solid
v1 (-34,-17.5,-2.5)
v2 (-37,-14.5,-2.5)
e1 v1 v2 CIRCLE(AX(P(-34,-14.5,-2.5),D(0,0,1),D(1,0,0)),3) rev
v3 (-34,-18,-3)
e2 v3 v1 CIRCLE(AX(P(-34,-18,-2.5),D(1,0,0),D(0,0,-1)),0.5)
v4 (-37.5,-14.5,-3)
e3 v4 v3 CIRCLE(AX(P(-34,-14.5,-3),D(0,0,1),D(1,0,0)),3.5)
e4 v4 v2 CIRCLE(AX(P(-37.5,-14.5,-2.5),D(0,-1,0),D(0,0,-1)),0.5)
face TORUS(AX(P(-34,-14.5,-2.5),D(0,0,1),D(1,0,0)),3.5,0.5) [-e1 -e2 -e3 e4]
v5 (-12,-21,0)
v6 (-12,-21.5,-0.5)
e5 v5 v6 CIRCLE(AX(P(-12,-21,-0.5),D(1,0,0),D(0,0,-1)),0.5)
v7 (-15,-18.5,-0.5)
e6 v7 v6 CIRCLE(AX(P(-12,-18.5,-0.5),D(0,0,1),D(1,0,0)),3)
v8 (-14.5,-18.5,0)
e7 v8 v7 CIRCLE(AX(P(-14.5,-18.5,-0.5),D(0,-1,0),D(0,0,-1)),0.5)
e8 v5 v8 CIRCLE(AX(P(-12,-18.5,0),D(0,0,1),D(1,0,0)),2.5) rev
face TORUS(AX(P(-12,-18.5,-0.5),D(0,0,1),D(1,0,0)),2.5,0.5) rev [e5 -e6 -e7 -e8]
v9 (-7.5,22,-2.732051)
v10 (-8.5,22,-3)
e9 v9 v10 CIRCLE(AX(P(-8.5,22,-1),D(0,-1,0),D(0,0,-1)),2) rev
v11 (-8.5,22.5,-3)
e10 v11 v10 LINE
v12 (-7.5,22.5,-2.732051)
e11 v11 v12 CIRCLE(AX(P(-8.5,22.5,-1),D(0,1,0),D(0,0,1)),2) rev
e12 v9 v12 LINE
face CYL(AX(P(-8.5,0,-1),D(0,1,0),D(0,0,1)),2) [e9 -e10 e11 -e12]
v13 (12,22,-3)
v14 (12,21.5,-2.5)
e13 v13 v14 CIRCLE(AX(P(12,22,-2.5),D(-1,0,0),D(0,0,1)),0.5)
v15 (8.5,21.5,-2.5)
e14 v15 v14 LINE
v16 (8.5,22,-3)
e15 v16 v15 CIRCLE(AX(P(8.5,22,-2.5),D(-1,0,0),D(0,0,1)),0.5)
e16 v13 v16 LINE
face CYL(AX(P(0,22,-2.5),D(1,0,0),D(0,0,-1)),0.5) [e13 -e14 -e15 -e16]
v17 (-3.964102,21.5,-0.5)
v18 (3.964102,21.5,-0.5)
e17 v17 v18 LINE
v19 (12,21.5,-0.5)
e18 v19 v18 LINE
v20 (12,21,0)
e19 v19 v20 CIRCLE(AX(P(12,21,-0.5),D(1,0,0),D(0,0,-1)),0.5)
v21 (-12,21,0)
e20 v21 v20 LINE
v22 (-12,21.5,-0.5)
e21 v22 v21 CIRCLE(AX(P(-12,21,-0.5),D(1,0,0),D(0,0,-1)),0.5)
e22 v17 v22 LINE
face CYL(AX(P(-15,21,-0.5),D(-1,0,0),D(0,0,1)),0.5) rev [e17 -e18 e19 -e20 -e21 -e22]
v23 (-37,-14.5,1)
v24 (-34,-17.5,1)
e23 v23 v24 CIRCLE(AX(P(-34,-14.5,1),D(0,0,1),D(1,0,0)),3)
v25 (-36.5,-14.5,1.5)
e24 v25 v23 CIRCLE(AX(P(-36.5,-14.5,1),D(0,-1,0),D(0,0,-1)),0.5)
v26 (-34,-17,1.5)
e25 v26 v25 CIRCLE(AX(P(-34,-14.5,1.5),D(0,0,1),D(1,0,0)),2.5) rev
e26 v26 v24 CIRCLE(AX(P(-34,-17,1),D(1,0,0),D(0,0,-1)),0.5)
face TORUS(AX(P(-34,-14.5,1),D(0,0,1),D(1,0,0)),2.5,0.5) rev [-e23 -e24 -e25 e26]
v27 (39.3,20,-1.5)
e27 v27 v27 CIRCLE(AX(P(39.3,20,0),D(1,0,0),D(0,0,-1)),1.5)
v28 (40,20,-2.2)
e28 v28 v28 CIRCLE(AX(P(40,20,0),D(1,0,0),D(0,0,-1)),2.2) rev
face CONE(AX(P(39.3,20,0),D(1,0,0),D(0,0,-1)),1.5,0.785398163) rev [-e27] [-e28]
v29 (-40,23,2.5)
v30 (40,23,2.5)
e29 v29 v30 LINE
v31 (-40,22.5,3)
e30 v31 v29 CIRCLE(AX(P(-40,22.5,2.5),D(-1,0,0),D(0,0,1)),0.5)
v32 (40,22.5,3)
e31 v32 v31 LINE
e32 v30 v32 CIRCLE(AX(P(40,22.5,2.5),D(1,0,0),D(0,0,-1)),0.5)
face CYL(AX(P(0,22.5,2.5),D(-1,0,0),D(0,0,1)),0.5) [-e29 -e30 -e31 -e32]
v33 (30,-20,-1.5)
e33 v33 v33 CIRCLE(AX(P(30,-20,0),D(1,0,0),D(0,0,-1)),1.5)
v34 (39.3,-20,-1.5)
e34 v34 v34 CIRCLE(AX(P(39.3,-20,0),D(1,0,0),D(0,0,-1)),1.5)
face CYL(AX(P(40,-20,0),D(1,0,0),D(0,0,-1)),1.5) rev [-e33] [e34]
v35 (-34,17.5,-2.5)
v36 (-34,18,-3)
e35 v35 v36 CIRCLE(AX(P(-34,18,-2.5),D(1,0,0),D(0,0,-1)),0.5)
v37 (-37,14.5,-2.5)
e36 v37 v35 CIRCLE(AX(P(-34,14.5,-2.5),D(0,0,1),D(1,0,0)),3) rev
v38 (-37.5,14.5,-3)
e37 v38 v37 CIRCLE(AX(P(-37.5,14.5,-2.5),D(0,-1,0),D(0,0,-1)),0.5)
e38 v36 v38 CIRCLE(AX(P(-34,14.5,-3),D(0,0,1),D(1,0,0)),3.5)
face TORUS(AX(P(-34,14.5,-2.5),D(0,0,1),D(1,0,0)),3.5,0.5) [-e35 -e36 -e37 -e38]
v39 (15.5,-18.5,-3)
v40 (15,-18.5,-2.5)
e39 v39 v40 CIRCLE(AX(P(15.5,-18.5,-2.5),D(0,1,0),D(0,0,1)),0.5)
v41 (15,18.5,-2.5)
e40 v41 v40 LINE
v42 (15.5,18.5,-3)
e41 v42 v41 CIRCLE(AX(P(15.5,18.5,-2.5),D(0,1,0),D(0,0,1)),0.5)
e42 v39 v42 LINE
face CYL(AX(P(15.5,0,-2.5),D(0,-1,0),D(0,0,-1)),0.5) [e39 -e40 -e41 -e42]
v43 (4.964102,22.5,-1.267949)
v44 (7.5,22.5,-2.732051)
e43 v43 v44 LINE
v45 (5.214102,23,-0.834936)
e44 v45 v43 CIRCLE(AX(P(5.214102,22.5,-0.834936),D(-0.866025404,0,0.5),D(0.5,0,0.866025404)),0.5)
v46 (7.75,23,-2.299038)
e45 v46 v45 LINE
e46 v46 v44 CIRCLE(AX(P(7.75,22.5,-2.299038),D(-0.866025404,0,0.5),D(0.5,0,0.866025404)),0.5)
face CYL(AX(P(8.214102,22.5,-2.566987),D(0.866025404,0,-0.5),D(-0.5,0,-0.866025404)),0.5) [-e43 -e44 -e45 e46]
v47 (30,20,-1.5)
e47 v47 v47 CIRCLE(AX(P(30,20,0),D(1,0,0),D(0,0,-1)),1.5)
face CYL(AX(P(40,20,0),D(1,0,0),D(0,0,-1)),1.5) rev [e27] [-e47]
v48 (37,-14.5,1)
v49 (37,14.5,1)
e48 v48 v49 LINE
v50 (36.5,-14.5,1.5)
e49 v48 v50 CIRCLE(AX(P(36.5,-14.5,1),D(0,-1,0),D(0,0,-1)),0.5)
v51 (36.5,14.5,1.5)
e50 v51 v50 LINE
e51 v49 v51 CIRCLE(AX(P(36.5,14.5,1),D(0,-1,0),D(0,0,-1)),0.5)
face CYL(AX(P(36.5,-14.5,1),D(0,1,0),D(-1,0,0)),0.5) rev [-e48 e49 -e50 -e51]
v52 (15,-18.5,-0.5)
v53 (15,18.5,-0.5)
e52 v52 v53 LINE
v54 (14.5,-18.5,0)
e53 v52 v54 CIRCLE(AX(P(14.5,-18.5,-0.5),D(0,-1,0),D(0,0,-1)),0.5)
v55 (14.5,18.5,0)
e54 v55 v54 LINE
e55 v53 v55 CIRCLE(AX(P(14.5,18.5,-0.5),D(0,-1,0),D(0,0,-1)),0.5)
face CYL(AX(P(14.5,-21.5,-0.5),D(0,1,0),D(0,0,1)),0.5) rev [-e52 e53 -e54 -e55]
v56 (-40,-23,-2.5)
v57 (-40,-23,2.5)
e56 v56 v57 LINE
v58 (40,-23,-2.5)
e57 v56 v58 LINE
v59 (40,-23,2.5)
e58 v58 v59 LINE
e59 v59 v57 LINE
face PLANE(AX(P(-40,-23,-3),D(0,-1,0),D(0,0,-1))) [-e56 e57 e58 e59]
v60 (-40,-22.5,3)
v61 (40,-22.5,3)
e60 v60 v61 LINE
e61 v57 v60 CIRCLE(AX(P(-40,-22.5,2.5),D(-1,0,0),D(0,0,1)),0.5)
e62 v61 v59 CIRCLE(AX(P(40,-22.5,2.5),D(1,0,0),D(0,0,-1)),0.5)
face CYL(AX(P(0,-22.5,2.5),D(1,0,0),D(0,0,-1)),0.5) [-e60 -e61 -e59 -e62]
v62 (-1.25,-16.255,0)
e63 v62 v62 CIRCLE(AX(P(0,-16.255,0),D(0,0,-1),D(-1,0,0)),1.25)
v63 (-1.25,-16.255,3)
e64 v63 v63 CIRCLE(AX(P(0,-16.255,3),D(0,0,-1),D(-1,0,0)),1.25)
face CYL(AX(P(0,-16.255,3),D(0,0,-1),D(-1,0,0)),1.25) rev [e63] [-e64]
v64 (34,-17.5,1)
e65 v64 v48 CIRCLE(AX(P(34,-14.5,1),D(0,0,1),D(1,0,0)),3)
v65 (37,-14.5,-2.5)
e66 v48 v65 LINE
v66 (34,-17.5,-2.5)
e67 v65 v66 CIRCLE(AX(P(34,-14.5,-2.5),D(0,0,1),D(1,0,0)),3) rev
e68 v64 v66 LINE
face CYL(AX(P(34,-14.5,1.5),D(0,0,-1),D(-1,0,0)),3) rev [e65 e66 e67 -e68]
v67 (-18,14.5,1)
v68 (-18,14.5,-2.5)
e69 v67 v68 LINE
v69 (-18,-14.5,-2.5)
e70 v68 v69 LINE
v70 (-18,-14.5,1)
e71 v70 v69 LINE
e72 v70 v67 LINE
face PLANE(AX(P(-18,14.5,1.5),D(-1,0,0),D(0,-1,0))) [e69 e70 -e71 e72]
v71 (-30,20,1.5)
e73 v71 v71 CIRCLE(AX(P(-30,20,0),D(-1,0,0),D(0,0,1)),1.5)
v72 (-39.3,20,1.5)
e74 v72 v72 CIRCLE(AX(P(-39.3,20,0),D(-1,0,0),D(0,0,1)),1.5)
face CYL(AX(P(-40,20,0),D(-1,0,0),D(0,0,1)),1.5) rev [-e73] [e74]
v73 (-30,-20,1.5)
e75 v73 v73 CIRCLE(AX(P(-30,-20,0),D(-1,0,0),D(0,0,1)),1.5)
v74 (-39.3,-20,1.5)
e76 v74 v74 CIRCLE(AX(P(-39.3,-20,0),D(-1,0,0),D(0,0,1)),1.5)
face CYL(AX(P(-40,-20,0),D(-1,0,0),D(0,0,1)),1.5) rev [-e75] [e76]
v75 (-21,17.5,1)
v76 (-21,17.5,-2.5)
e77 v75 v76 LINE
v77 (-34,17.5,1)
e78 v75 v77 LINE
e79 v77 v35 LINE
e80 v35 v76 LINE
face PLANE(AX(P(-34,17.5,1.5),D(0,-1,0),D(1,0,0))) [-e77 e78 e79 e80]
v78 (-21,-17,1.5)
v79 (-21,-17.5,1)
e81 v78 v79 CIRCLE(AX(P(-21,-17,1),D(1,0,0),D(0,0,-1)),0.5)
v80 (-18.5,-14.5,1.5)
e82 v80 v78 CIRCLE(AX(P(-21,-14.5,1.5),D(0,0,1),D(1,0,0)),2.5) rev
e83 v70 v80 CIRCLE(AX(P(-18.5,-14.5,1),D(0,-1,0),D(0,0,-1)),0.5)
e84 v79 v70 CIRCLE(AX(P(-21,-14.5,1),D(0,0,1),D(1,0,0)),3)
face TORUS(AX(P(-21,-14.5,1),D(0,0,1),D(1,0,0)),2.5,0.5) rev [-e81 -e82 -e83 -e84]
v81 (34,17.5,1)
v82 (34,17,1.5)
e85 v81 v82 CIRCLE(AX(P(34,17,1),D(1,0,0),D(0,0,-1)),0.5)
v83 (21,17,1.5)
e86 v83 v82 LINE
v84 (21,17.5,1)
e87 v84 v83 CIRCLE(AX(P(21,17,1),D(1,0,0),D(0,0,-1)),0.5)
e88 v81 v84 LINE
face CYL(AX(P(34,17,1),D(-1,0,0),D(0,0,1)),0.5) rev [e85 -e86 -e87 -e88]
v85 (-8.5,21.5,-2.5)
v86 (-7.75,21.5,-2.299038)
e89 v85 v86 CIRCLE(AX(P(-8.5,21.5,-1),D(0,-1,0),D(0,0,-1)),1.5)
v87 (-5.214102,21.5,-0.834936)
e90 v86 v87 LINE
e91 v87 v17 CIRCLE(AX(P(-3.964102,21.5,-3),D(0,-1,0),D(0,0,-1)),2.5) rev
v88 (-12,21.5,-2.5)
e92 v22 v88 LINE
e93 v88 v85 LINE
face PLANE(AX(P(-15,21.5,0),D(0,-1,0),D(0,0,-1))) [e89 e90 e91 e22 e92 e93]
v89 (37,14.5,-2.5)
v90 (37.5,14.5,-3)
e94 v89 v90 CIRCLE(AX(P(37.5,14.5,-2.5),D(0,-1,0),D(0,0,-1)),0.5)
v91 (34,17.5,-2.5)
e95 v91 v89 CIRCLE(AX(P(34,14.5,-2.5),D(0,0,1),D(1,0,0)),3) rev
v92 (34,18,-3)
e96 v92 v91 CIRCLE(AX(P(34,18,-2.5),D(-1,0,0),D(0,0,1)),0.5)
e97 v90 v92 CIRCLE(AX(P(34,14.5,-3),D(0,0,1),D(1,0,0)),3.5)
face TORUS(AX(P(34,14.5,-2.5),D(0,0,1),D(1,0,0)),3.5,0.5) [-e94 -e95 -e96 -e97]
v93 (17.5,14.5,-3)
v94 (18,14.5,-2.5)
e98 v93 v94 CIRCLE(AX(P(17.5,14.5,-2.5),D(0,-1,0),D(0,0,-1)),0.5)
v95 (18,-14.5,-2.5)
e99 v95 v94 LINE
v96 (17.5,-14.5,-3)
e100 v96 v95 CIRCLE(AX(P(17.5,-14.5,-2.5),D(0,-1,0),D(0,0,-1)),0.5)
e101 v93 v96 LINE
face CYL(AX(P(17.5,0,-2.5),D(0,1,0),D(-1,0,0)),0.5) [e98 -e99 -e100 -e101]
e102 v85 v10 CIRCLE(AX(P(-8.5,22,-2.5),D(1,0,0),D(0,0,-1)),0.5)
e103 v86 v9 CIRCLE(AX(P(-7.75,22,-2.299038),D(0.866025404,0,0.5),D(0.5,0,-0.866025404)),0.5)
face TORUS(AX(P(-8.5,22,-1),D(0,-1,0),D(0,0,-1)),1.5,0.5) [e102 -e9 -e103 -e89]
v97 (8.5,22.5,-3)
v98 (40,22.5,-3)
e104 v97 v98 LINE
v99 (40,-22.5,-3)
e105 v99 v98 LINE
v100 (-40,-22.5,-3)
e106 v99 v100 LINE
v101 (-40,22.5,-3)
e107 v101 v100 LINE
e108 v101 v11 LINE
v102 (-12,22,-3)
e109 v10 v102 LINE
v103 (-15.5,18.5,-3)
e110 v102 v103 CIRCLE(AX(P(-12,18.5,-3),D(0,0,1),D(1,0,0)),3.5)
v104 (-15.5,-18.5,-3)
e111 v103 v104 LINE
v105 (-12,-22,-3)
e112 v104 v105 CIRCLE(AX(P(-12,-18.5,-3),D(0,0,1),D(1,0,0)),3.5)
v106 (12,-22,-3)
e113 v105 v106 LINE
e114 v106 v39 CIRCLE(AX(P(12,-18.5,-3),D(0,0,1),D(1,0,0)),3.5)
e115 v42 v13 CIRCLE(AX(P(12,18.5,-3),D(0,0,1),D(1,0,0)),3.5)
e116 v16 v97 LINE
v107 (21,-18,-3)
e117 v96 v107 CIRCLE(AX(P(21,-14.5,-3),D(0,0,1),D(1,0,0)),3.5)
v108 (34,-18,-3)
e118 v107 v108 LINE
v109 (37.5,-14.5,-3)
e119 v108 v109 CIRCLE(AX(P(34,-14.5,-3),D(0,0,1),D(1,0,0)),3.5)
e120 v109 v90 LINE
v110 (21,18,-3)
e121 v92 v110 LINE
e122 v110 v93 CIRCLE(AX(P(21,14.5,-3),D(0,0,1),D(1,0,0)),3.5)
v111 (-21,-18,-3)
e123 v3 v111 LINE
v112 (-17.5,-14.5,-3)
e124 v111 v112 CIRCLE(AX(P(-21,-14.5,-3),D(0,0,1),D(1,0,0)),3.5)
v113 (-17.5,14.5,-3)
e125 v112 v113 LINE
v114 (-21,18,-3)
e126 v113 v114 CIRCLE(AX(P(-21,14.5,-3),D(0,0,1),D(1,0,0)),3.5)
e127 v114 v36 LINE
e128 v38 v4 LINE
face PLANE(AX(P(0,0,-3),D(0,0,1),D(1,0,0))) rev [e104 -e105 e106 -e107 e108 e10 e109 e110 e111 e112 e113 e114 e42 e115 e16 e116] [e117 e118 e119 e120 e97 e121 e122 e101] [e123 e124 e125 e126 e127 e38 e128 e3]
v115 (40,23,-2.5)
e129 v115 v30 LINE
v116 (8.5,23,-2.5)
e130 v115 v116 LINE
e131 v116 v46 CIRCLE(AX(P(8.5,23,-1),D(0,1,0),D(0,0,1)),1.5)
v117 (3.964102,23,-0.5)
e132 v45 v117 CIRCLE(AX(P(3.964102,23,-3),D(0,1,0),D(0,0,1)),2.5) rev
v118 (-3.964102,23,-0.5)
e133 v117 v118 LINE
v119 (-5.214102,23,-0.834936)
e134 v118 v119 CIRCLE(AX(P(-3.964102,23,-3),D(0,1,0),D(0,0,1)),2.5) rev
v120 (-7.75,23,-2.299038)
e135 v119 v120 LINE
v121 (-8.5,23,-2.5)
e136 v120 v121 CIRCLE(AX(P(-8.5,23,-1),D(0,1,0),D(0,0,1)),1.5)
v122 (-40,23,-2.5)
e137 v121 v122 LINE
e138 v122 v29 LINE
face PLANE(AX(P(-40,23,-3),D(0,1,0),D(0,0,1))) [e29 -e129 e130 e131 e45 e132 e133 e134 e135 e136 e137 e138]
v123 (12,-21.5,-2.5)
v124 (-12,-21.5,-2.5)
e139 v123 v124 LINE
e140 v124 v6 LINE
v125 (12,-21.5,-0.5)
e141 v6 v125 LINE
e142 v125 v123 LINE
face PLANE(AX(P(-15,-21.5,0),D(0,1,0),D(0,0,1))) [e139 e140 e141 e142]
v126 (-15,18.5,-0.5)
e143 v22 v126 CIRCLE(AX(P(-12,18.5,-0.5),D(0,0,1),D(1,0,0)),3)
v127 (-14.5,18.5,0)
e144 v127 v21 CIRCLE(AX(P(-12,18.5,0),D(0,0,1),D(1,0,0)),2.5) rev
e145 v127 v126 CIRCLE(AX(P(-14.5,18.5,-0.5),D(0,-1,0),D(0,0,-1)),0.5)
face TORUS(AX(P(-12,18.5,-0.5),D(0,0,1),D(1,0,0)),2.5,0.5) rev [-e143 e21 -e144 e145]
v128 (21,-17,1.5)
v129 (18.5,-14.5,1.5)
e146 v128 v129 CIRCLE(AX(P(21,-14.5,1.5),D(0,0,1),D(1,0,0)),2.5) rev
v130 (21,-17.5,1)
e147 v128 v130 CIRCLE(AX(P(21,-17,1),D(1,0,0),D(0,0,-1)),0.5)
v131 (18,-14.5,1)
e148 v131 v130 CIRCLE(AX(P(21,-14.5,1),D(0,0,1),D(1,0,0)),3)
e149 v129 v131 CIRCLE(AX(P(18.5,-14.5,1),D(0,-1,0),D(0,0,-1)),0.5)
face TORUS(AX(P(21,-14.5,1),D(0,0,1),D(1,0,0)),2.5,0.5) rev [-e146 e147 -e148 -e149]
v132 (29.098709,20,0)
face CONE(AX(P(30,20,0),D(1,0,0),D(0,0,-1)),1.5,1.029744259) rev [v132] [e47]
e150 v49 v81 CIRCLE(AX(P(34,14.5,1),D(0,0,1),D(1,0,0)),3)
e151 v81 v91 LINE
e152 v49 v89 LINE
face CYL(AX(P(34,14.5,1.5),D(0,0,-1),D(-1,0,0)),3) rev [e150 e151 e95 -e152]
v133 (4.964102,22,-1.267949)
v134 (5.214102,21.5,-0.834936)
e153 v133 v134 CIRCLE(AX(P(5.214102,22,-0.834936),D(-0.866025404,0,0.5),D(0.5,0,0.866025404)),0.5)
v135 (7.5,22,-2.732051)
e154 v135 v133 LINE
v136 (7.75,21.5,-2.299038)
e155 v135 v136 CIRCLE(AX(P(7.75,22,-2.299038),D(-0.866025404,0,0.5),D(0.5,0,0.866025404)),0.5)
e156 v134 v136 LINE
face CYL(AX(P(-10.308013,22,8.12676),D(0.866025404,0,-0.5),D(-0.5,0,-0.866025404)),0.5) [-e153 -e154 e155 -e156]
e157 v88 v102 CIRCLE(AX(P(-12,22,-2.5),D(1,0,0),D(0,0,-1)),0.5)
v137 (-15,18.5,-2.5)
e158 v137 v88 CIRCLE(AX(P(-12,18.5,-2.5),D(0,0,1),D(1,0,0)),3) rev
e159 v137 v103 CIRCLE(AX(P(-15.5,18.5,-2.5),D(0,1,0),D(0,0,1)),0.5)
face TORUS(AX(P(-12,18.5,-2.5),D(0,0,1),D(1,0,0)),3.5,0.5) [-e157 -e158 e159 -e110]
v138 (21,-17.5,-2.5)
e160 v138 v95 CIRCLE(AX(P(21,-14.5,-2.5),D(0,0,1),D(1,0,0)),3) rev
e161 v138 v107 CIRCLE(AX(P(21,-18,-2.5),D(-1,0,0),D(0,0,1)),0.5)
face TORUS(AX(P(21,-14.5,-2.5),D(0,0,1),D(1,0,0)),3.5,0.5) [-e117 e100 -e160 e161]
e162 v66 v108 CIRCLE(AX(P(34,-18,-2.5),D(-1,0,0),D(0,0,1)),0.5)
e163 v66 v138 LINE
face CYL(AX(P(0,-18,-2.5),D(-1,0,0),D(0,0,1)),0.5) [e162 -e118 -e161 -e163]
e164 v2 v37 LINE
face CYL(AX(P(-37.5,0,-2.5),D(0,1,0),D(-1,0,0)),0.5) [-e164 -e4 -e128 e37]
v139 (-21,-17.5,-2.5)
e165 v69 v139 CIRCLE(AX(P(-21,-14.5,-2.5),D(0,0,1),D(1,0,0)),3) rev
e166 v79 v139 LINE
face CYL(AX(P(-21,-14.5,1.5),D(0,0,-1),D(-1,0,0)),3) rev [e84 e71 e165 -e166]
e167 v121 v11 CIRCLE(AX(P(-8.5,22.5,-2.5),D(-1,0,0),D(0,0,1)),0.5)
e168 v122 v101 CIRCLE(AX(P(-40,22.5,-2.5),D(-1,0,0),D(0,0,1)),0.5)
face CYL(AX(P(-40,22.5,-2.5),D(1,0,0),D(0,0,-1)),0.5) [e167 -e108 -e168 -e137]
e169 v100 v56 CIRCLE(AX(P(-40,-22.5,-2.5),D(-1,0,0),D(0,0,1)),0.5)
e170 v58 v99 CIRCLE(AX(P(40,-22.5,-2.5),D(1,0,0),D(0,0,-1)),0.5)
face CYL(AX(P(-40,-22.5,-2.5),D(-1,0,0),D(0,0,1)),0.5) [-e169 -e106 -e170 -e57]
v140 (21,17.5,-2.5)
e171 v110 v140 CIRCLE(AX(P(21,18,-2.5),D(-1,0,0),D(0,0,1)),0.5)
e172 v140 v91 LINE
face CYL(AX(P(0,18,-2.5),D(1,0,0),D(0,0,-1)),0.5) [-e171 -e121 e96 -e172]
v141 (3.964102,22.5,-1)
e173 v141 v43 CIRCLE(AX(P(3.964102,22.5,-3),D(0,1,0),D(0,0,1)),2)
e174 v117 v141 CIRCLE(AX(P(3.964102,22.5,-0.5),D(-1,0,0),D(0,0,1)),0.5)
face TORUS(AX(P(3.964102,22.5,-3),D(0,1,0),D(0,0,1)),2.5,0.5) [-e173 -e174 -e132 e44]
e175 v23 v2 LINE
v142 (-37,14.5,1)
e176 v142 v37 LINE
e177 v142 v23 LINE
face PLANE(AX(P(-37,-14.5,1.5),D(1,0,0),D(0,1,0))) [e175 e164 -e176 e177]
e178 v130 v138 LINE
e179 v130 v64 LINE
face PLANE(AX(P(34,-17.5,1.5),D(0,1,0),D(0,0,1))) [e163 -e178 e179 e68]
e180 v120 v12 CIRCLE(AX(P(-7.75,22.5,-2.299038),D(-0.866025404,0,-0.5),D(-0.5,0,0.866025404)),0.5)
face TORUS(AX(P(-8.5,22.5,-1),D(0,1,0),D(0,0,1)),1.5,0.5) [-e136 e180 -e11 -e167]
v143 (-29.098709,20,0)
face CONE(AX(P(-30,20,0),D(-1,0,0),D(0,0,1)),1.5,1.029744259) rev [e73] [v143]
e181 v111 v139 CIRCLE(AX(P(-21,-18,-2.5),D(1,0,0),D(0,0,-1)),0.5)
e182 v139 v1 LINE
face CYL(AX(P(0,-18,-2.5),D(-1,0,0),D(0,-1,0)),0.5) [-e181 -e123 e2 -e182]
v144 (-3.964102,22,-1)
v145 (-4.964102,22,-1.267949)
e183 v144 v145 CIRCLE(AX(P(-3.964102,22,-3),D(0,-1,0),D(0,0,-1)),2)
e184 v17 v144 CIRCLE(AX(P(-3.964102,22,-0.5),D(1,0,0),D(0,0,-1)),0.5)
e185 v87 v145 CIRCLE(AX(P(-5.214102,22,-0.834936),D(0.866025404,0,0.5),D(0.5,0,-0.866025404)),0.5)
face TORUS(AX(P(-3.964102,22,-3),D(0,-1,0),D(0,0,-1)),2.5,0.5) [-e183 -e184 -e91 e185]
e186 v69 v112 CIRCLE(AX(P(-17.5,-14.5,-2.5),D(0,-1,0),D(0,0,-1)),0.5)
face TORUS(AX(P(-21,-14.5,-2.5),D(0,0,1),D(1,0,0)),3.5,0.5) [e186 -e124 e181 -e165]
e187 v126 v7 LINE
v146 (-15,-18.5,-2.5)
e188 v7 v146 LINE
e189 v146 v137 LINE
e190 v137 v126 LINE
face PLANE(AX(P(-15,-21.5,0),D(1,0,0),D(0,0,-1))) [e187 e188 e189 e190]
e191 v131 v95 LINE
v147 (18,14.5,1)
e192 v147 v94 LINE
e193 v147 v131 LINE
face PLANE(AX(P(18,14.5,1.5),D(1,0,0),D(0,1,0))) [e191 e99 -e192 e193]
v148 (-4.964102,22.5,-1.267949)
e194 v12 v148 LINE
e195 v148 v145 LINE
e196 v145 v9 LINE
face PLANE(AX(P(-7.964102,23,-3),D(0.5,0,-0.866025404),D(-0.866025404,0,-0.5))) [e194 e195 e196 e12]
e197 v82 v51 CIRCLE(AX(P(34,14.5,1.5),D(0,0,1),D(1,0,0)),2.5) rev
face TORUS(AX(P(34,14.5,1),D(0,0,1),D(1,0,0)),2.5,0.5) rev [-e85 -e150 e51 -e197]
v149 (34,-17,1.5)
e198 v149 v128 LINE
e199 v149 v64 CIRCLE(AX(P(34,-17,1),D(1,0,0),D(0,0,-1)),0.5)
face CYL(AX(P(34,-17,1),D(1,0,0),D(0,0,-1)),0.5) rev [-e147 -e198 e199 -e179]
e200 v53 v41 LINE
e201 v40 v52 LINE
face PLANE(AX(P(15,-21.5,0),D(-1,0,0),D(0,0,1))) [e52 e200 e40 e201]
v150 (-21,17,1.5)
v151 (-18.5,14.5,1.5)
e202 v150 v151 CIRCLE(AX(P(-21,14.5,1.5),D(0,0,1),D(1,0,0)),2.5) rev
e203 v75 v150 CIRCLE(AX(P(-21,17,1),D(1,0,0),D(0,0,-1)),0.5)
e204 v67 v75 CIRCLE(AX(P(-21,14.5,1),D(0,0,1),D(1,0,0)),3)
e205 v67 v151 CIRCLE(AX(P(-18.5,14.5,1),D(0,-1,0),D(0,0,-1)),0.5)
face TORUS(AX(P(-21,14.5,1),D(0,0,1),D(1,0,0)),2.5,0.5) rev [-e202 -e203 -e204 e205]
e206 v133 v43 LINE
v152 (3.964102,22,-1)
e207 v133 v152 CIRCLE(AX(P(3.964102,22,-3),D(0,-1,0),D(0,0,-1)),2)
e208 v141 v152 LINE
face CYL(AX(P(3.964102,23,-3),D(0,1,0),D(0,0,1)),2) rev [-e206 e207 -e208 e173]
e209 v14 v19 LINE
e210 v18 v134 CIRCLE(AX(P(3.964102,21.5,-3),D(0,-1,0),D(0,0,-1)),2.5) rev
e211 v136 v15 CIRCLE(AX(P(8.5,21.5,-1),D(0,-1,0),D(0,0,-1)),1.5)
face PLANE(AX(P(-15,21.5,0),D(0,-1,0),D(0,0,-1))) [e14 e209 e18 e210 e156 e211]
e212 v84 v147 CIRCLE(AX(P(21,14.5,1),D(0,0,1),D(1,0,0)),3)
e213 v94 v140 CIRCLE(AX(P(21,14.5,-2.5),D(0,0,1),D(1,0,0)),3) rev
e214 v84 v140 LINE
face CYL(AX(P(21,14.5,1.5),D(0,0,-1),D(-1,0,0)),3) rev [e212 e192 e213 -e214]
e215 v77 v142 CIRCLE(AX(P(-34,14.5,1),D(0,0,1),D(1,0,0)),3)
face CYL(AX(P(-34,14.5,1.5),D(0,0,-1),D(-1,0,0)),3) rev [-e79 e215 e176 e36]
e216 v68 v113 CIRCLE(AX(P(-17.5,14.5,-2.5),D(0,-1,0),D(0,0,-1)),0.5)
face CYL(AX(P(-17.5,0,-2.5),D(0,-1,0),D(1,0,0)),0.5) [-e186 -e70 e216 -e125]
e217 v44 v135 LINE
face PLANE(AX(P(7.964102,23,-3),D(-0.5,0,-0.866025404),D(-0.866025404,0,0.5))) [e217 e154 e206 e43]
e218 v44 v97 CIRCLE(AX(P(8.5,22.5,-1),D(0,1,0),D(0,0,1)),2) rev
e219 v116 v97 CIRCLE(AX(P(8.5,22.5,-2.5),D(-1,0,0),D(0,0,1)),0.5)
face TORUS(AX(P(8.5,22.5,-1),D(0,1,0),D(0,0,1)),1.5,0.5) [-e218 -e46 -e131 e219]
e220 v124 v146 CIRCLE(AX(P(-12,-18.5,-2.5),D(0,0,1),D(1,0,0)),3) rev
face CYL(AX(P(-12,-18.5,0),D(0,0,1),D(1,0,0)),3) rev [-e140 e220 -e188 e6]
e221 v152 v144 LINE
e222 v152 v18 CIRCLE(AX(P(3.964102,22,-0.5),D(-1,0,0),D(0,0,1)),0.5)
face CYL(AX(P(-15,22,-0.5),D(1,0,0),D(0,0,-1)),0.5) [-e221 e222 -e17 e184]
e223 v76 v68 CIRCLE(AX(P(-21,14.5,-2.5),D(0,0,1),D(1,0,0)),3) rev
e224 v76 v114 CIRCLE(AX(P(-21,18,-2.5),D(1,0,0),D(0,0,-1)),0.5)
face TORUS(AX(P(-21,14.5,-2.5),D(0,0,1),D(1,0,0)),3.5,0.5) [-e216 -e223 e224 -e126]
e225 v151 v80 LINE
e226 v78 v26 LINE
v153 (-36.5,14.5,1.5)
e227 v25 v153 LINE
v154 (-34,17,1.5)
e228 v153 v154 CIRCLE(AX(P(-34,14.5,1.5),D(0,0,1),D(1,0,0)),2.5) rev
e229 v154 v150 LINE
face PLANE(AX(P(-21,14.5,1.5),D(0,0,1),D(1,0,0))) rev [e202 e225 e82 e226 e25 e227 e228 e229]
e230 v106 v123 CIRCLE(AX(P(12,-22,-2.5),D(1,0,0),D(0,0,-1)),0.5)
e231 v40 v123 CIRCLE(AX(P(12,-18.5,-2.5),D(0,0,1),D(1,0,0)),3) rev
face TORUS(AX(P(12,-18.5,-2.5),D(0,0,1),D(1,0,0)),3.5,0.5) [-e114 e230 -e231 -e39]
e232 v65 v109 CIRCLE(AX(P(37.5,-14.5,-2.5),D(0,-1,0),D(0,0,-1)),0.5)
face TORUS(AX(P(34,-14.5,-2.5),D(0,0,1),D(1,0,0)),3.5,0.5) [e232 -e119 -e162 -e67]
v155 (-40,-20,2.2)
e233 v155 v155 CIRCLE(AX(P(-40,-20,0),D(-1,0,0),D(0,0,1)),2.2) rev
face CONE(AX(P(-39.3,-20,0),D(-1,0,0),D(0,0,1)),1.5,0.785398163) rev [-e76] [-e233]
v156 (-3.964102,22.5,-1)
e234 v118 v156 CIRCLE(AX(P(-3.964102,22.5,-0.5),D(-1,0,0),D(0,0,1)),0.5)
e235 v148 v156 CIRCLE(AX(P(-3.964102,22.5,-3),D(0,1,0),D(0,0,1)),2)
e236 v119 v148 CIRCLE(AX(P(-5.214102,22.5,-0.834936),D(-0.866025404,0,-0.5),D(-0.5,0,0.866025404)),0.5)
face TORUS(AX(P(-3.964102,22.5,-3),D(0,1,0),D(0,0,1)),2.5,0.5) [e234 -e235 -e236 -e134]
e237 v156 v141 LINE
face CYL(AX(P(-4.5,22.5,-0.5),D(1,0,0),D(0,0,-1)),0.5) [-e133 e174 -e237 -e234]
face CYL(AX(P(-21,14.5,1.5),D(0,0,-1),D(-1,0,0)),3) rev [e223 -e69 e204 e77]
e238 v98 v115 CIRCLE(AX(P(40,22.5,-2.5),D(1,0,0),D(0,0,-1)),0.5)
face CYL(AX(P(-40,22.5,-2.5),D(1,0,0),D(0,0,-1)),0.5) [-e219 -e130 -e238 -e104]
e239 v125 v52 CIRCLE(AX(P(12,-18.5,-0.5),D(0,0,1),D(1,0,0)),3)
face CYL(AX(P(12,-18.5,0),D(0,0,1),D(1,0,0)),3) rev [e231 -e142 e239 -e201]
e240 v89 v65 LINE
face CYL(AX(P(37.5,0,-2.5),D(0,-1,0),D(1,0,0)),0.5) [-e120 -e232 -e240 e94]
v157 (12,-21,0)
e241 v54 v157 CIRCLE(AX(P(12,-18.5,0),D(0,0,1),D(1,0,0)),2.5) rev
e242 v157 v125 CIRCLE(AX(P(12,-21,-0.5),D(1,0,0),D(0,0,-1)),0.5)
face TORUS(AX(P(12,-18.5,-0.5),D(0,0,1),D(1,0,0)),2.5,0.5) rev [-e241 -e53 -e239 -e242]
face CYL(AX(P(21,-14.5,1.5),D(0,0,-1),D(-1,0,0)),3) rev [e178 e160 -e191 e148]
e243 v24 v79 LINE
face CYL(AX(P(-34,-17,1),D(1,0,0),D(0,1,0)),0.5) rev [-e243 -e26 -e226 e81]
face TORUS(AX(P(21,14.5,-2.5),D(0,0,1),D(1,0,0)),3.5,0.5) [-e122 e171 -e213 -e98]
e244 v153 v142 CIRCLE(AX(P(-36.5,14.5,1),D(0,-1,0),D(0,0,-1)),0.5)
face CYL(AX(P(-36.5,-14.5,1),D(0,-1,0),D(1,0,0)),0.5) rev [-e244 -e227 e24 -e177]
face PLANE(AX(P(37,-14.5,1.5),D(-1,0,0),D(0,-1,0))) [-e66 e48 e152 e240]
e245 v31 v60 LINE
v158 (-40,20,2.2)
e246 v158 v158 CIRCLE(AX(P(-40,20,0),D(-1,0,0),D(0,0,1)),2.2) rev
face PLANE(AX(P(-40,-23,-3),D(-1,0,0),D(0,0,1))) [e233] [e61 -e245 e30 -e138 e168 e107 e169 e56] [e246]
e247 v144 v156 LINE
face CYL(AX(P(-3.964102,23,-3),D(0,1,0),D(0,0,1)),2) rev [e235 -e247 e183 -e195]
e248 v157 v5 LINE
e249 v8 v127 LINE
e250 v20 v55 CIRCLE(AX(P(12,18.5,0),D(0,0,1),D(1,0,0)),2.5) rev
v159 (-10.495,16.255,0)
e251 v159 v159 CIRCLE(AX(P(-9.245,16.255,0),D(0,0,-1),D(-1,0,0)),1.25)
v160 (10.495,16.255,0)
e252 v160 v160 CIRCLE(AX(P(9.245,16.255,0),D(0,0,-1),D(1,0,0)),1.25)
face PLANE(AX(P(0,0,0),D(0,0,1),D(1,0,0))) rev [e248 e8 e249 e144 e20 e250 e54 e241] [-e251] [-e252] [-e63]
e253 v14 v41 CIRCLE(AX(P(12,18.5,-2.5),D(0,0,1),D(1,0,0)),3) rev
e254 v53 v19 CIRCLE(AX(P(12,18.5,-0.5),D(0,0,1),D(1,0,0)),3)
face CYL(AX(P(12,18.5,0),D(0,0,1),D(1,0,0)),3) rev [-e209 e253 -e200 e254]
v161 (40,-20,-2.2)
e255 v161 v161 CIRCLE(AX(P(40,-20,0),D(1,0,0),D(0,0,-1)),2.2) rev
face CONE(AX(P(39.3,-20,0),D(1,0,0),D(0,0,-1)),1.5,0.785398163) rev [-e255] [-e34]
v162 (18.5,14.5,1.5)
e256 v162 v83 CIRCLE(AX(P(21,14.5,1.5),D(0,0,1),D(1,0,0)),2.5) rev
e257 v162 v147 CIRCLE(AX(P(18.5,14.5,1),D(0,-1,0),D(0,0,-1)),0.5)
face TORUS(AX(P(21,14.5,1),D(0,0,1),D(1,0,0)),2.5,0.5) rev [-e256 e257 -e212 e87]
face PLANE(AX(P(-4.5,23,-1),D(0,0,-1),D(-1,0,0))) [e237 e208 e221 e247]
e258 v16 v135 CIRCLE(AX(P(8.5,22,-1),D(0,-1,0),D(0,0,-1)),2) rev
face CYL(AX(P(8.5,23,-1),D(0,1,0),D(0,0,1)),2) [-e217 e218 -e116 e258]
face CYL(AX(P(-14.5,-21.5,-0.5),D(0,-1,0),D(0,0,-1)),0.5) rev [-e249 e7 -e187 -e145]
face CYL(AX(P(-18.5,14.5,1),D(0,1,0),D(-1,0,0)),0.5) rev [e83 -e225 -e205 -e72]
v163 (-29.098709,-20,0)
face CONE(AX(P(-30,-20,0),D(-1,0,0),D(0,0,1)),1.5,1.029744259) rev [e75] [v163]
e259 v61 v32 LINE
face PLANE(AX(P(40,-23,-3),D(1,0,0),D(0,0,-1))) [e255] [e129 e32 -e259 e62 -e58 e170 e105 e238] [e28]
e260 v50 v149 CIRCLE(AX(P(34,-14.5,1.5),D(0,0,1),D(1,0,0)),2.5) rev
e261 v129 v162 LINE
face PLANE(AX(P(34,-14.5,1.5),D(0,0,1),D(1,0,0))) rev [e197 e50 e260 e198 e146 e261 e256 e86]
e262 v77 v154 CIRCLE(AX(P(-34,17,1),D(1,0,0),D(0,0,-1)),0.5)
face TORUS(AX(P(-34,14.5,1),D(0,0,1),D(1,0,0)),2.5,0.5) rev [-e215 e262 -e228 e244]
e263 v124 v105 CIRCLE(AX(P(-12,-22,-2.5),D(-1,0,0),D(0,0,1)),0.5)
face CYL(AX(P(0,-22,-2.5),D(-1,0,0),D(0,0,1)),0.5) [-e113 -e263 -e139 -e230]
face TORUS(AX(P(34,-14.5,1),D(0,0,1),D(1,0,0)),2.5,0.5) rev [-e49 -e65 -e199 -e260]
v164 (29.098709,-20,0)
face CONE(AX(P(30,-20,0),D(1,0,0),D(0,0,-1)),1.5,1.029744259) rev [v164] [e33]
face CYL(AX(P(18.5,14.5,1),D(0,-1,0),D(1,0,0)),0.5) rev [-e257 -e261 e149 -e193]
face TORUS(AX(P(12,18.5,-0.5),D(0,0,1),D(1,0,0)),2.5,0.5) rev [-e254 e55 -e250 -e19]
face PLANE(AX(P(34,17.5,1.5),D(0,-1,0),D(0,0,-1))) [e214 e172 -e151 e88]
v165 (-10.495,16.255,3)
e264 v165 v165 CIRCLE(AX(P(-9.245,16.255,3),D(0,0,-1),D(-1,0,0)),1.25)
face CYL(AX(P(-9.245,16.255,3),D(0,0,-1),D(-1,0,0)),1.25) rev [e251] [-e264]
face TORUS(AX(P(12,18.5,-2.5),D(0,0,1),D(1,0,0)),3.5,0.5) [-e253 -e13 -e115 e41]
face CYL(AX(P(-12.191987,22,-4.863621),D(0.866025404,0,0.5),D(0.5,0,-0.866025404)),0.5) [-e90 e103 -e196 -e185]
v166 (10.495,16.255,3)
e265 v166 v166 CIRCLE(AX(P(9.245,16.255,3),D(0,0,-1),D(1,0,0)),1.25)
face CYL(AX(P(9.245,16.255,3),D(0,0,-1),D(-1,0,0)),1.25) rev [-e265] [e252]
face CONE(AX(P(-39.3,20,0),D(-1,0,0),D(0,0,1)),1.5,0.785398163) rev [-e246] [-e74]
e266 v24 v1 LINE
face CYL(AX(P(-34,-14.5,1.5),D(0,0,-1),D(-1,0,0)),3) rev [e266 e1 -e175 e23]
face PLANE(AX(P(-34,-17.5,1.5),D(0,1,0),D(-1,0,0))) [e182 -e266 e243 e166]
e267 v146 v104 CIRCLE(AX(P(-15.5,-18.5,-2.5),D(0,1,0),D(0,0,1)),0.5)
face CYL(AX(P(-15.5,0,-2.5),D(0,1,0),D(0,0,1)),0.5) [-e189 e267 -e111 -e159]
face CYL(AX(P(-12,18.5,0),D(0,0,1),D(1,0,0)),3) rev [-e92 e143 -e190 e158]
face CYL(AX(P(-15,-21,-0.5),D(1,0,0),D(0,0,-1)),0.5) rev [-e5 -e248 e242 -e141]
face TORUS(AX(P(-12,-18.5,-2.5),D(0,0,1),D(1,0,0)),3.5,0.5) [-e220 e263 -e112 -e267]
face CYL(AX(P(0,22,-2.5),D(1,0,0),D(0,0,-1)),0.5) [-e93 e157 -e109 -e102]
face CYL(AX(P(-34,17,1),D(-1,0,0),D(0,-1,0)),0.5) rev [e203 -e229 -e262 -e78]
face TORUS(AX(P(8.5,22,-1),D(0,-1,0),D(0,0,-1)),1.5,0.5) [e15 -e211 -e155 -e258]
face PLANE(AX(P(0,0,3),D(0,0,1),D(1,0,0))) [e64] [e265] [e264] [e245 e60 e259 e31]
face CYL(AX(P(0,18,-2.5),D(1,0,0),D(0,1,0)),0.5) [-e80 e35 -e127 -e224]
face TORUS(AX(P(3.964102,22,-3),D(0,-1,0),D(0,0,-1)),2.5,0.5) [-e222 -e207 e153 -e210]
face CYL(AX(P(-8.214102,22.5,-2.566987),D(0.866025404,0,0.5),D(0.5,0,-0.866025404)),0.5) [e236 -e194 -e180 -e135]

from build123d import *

# Parameters (mm, degrees)
AUFSATZ_LINEAR_AUSTRAGEN1_DEPTH         = 3
AUFSATZ_LINEAR_AUSTRAGEN1_DEPTH_BACK    = 3
SKIZZE1_W                               = 80
SKIZZE1_H                               = 46
F_3_0_3_DURCHMESSER_BOHRUNG1_AT_2_COUNT = 2
F_3_0_3_DURCHMESSER_BOHRUNG1_AT_2_PITCH = 40
SKIZZE4_W                               = 30
SKIZZE4_H                               = 43
SCHNITT_LINEAR_AUSTRAGEN1_DEPTH         = 3
VERRUNDUNG1_R                           = 3
SCHNITT_LINEAR_AUSTRAGEN2_DEPTH         = 1.5
SCHNITT_LINEAR_AUSTRAGEN2_DEPTH_BACK    = 47.238512087
SKIZZE8_R                               = 1.25
SCHNITT_LINEAR_AUSTRAGEN4_DEPTH         = 47.238512087
SCHNITT_LINEAR_AUSTRAGEN5_DEPTH         = 47.238512087
VERRUNDUNG3_R                           = 2
VERRUNDUNG2_R                           = 0.5
FASE1_SIZE                              = 0.7


with BuildPart() as part:
    # Skizze1 → Aufsatz-Linear austragen1 (new, two sides: drawn at the far end of the back side and taken through both)
    with BuildSketch(Plane.XY.offset(-AUFSATZ_LINEAR_AUSTRAGEN1_DEPTH_BACK)):
        Rectangle(SKIZZE1_W, SKIZZE1_H)
    extrude(amount=AUFSATZ_LINEAR_AUSTRAGEN1_DEPTH + AUFSATZ_LINEAR_AUSTRAGEN1_DEPTH_BACK)

    # Skizze2 → Ø3.0 (3) Durchmesser Bohrung1 (revolve, cut)
    with BuildSketch(Plane(origin=(40, -20, 0), x_dir=(0, 0, -1), z_dir=(0, 1, 0))):
        Polygon((0, 0), (0, 10.901290929), (1.5, 10), (1.5, 0), align=None)
    f_3_0_3_durchmesser_bohrung1 = revolve(axis=Axis((46.35, -20, 0), (-1, 0, 0)), mode=Mode.SUBTRACT)

    # Ø3.0 (3) Durchmesser Bohrung1 at 2: Ø3.0 (3) Durchmesser Bohrung1 ×2
    with Locations(*[(0, i * F_3_0_3_DURCHMESSER_BOHRUNG1_AT_2_PITCH, 0) for i in range(1, F_3_0_3_DURCHMESSER_BOHRUNG1_AT_2_COUNT)]):
        add(f_3_0_3_durchmesser_bohrung1, mode=Mode.SUBTRACT)

    # Spiegeln1: Ø3.0 (3) Durchmesser Bohrung1 across plane
    add(f_3_0_3_durchmesser_bohrung1.mirror(Plane(origin=(0, 0, 0), x_dir=(0, 0, 1), z_dir=(1, 0, 0))), mode=Mode.SUBTRACT)

    # Spiegeln1 copy 1 sketch → Spiegeln1 copy 1 (revolve, cut)
    with BuildSketch(Plane(origin=(-40, 20, 0), x_dir=(0, 0, -1), z_dir=(0, 1, 0))):
        Polygon((0, 0), (0, -10.901290929), (1.5, -10), (1.5, 0), align=None)
    revolve(axis=Axis((-46.35, 20, 0), (-1, 0, 0)), mode=Mode.SUBTRACT)

    # Skizze4 → Schnitt-Linear austragen1 (cut)
    with BuildSketch(Plane.XY.offset(-3)):
        Rectangle(SKIZZE4_W, SKIZZE4_H)
    extrude(amount=SCHNITT_LINEAR_AUSTRAGEN1_DEPTH, mode=Mode.SUBTRACT)

    # Verrundung1
    verrundung1_edges = [part.edges().sort_by_distance(p)[0] for p in [
        (15, 21.5, -1.5),
        (-15, 21.5, -1.5),
        (-15, -21.5, -1.5),
        (15, -21.5, -1.5),
    ]]
    fillet(verrundung1_edges, radius=VERRUNDUNG1_R)

    # Skizze5 → Schnitt-Linear austragen2 (cut, two sides: drawn at the far end of the back side and taken through both)
    with BuildSketch(Plane.XY.offset(-SCHNITT_LINEAR_AUSTRAGEN2_DEPTH_BACK)):
        with BuildLine():
            Line((37, -14.5), (37, 14.5))
            ThreePointArc((37, 14.5), (36.121320344, 16.621320344), (34, 17.5))
            Line((34, 17.5), (21, 17.5))
            ThreePointArc((21, 17.5), (18.878679656, 16.621320344), (18, 14.5))
            Line((18, 14.5), (18, -14.5))
            ThreePointArc((18, -14.5), (18.878679656, -16.621320344), (21, -17.5))
            Line((21, -17.5), (34, -17.5))
            ThreePointArc((34, -17.5), (36.121320344, -16.621320344), (37, -14.5))
        make_face()
        with BuildLine():
            Line((-34, -17.5), (-21, -17.5))
            ThreePointArc((-21, -17.5), (-18.878679656, -16.621320344), (-18, -14.5))
            Line((-18, -14.5), (-18, 14.5))
            ThreePointArc((-18, 14.5), (-18.878679656, 16.621320344), (-21, 17.5))
            Line((-21, 17.5), (-34, 17.5))
            ThreePointArc((-34, 17.5), (-36.121320344, 16.621320344), (-37, 14.5))
            Line((-37, 14.5), (-37, -14.5))
            ThreePointArc((-37, -14.5), (-36.121320344, -16.621320344), (-34, -17.5))
        make_face()
    extrude(amount=SCHNITT_LINEAR_AUSTRAGEN2_DEPTH + SCHNITT_LINEAR_AUSTRAGEN2_DEPTH_BACK, mode=Mode.SUBTRACT)

    # Skizze8 → Schnitt-Linear austragen4 (cut, through all)
    with BuildSketch(Plane(origin=(0, 0, 0), x_dir=(-1, 0, 0), z_dir=(0, 0, -1))):
        with Locations((0, -16.255)):
            Circle(SKIZZE8_R)
        with Locations((9.245, 16.255)):
            Circle(SKIZZE8_R)
        with Locations(Location((-9.245, 16.255, 0), (0, 0, 180))):
            Circle(SKIZZE8_R)
    extrude(amount=-SCHNITT_LINEAR_AUSTRAGEN4_DEPTH, mode=Mode.SUBTRACT)

    # Skizze9 → Schnitt-Linear austragen5 (cut, through all)
    with BuildSketch(Plane(origin=(0, 0, 0), x_dir=(1, 0, 0), z_dir=(0, 1, 0))):
        Polygon((7.964101615, 3), (-7.964101615, 3), (-4.5, 1), (4.5, 1), align=None)
    extrude(amount=SCHNITT_LINEAR_AUSTRAGEN5_DEPTH, mode=Mode.SUBTRACT)

    # Verrundung3
    verrundung3_edges = [part.edges().sort_by_distance(p)[0] for p in [
        (-7.964101615, 22.25, -3),
        (-4.5, 22.25, -1),
        (4.5, 22.25, -1),
        (7.964101615, 22.25, -3),
    ]]
    fillet(verrundung3_edges, radius=VERRUNDUNG3_R)

    # Verrundung2
    verrundung2_edges = [part.edges().sort_by_distance(p)[0] for p in [
        (0, -23, -3),
        (27.5, -17.5, -3),
        (36.121320344, -16.621320344, 1.5),
        (37, 0, 1.5),
        (36.121320344, 16.621320344, 1.5),
        (27.5, 17.5, 1.5),
        (18.878679656, 16.621320344, 1.5),
        (18, 0, 1.5),
        (18.878679656, -16.621320344, 1.5),
        (27.5, -17.5, 1.5),
        (0, 23, 3),
        (0, -23, 3),
        (6.232050808, 23, -2),
        (6.232050808, 21.5, -2),
        (-10.25, 21.5, -3),
        (-6.232050808, 21.5, -2),
        (0, 21.5, -1),
        (-7.98236191, 21.5, -2.931851653),
        (7.98236191, 21.5, -2.931851653),
        (-24.25, 23, -3),
        (0, 23, -1),
        (-6.232050808, 23, -2),
        (-7.98236191, 23, -2.931851653),
        (7.98236191, 23, -2.931851653),
        (4.481739705, 21.5, -1.068148347),
        (4.481739705, 23, -1.068148347),
        (-4.481739705, 21.5, -1.068148347),
        (-4.481739705, 23, -1.068148347),
        (24.25, 23, -3),
        (-15, 0, -3),
        (-15, 0, 0),
        (0, -21.5, -3),
        (0, -21.5, 0),
        (0, 21.5, 0),
        (15, 0, 0),
        (14.121320344, 20.621320344, 0),
        (-14.121320344, 20.621320344, 0),
        (14.121320344, -20.621320344, 0),
        (-14.121320344, -20.621320344, 0),
        (15, 0, -3),
        (10.25, 21.5, -3),
        (-14.121320344, -20.621320344, -3),
        (14.121320344, -20.621320344, -3),
        (-14.121320344, 20.621320344, -3),
        (14.121320344, 20.621320344, -3),
        (-18.878679656, 16.621320344, -3),
        (-27.5, 17.5, -3),
        (-36.121320344, 16.621320344, -3),
        (-37, 0, -3),
        (-36.121320344, -16.621320344, -3),
        (-27.5, -17.5, -3),
        (-18.878679656, -16.621320344, -3),
        (-18, 0, -3),
        (-18.878679656, 16.621320344, 1.5),
        (-27.5, 17.5, 1.5),
        (-36.121320344, 16.621320344, 1.5),
        (-37, 0, 1.5),
        (-36.121320344, -16.621320344, 1.5),
        (-27.5, -17.5, 1.5),
        (-18.878679656, -16.621320344, 1.5),
        (-18, 0, 1.5),
        (36.121320344, -16.621320344, -3),
        (37, 0, -3),
        (36.121320344, 16.621320344, -3),
        (27.5, 17.5, -3),
        (18.878679656, 16.621320344, -3),
        (18, 0, -3),
        (18.878679656, -16.621320344, -3),
    ]]
    fillet(verrundung2_edges, radius=VERRUNDUNG2_R - 0.0001)  # a hair under: the kernel refuses the full size

    # Fase1
    fase1_edges = [part.edges().sort_by_distance(p)[0] for p in [
        (40, 20, 1.5),
        (40, -20, 1.5),
        (-40, 20, 1.5),
        (-40, -20, 1.5),
    ]]
    chamfer(fase1_edges, length=FASE1_SIZE)


solid = part.part
